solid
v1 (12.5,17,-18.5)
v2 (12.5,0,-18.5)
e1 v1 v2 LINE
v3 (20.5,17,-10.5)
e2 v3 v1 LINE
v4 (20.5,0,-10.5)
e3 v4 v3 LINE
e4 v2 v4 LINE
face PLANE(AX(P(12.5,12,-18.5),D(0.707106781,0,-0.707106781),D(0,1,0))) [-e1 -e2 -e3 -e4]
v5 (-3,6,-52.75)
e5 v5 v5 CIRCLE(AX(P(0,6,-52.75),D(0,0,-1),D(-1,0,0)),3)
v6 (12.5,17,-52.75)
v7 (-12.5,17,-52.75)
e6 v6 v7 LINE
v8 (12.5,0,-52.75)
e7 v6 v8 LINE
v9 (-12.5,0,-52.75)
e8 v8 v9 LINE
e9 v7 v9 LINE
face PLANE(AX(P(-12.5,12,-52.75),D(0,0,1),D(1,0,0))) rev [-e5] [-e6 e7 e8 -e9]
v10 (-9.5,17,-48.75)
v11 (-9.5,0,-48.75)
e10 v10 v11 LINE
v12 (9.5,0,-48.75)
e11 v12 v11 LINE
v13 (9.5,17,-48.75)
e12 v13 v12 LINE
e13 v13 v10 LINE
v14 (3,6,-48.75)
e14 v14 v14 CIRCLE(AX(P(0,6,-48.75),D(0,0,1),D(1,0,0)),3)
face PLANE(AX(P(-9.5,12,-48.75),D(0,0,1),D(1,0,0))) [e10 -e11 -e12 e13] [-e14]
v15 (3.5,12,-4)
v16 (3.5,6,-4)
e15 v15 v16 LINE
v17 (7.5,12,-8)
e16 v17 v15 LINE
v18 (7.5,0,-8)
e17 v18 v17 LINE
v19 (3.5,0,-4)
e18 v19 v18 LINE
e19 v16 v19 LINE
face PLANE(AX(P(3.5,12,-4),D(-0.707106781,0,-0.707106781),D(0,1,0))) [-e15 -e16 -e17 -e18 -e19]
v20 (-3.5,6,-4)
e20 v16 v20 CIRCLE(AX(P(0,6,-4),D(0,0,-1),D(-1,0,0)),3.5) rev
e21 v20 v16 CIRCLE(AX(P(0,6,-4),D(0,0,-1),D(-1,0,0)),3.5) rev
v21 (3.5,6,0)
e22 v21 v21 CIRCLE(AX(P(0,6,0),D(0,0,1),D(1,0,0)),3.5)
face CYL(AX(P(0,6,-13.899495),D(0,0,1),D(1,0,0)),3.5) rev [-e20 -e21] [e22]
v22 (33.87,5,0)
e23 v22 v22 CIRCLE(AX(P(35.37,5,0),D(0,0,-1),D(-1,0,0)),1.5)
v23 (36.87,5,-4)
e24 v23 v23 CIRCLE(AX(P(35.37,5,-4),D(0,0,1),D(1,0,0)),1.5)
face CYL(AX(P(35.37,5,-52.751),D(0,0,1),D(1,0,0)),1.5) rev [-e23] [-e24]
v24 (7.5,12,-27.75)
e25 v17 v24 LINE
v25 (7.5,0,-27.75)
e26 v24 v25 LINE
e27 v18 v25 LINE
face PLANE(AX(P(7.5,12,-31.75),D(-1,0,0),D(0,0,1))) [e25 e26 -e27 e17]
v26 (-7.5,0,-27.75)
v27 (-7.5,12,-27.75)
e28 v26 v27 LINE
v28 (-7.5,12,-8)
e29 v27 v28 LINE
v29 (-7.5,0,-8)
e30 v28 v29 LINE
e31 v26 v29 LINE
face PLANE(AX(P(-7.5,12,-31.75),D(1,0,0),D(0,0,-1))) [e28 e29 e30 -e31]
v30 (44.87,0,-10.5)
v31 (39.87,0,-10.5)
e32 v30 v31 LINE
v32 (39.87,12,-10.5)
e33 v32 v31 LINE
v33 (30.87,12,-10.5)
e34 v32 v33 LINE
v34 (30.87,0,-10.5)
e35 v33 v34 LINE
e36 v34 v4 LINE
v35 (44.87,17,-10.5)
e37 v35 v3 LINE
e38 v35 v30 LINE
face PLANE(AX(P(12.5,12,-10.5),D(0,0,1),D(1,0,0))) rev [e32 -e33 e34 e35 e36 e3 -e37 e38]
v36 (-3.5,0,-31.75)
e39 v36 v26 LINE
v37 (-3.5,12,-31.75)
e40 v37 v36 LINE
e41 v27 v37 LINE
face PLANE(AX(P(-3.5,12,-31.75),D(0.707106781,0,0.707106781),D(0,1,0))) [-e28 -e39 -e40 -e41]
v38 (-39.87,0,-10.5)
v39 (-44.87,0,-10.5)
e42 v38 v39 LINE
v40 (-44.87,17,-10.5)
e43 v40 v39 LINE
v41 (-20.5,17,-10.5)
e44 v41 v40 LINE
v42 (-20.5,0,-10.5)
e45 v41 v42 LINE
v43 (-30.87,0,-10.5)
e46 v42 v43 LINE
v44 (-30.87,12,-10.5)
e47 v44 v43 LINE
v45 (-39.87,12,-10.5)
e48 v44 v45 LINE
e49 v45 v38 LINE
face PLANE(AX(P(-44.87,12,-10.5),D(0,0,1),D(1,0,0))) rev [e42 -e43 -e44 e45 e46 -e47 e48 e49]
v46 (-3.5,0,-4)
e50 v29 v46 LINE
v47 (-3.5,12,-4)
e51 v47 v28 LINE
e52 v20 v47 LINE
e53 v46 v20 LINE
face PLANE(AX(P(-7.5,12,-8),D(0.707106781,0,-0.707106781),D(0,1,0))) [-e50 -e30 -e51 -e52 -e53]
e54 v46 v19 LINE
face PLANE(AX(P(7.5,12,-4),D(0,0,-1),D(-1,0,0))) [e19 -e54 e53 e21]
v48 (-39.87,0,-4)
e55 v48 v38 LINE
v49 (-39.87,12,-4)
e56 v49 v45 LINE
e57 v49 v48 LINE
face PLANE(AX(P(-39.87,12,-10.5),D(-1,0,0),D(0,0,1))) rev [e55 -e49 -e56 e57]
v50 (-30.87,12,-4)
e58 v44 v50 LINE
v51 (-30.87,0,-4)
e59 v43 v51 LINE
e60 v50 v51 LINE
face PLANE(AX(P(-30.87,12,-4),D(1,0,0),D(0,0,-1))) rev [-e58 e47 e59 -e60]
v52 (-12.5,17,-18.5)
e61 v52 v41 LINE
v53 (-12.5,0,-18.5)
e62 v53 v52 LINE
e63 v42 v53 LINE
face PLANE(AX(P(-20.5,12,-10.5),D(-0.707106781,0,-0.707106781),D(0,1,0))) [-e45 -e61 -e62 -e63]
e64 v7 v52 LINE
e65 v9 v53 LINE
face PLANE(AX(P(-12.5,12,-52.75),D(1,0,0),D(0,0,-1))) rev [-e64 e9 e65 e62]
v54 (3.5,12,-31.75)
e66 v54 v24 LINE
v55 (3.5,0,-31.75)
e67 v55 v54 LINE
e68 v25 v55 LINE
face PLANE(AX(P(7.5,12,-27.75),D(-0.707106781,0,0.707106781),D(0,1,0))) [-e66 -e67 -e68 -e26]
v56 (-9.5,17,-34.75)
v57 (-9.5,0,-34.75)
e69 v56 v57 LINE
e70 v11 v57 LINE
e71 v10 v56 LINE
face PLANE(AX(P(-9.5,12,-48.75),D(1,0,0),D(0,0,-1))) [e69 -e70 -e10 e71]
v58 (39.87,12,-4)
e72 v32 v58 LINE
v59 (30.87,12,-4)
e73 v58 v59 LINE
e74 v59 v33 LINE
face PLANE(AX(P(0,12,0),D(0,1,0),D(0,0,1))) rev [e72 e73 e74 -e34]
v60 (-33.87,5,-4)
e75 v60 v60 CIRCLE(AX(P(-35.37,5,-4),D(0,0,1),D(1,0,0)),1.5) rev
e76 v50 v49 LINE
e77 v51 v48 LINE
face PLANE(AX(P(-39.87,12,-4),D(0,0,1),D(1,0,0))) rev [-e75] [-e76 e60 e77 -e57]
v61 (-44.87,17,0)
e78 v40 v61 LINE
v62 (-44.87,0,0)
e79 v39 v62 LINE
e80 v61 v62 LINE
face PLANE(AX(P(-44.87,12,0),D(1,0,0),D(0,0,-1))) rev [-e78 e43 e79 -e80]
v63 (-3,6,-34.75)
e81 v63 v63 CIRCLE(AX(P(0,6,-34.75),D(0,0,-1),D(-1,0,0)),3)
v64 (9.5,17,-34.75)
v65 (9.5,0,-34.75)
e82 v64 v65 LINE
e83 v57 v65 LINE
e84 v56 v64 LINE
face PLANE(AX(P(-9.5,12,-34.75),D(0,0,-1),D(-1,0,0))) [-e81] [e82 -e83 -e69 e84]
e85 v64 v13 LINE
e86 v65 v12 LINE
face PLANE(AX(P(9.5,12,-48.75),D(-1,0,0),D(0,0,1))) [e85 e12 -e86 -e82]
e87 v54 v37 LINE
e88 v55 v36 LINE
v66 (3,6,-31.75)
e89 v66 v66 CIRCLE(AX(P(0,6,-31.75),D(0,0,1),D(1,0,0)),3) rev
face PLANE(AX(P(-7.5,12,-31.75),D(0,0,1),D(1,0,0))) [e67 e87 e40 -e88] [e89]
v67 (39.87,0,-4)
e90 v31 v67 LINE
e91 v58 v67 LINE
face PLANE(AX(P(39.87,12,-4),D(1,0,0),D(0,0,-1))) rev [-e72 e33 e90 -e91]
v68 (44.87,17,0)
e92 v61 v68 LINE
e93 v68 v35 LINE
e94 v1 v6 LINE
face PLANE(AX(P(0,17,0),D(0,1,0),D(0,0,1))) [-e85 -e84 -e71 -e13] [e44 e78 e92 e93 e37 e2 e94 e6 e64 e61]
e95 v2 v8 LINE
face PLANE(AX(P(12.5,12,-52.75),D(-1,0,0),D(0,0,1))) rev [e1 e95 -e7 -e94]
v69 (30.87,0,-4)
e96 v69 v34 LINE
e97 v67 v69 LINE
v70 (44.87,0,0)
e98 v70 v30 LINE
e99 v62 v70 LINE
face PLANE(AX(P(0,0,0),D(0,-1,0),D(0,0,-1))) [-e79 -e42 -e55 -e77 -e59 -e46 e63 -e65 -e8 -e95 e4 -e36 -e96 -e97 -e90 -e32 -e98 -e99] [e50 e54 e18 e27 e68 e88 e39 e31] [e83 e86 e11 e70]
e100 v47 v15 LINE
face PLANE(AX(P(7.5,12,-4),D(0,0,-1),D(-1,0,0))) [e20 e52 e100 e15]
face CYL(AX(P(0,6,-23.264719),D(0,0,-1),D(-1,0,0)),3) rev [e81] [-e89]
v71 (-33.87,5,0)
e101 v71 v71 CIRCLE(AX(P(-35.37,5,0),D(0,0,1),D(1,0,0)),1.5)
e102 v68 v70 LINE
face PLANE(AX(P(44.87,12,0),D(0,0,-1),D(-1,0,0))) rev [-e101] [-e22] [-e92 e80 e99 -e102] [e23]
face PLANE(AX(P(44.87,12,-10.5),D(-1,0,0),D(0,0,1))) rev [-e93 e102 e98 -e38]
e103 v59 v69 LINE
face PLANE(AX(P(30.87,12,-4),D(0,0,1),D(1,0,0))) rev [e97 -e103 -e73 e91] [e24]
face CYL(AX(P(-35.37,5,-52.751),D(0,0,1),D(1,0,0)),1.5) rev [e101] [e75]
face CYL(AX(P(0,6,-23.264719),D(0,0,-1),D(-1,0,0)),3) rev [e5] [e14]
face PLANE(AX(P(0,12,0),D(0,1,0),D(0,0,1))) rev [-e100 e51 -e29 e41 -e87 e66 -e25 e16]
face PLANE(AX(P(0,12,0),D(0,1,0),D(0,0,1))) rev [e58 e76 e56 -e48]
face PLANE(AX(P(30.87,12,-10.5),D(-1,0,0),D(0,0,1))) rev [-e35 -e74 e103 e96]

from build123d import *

# Parameters (mm, degrees)
SKETCH_1_W          = 19
SKETCH_1_H          = 14
EXTRUDE_1_DEPTH     = 12
CUT_EXTRUDE_2_REACH = 72.284
SKETCH_4_R          = 1.5
SKETCH_5_W          = 19
SKETCH_5_H          = 14
EXTRUDE_2_DEPTH     = 5
CUT_EXTRUDE_4_REACH = 73.308
SKETCH_6_R          = 3
SKETCH_7_R          = 3.5
CUT_EXTRUDE_5_DEPTH = 4
CHAMFER_1_SIZE      = 4
CHAMFER_2_SIZE      = 8


with BuildPart() as part:
    # 草图1 → 凸台-拉伸1 (new body)
    with BuildSketch(Plane(origin=(0, 0, 0), x_dir=(1, 0, 0), z_dir=(0, 1, 0))):
        Polygon((-30.87, 10.5), (-12.5, 10.5), (-12.5, 52.75), (12.5, 52.75), (12.5, 10.5), (30.87, 10.5), (30.87, 4), (39.87, 4), (39.87, 10.5), (44.87, 10.5), (44.87, 0), (-44.87, 0), (-44.87, 10.5), (-39.87, 10.5), (-39.87, 4), (-30.87, 4), align=None)
        with Locations((0, 41.75)):
            Rectangle(SKETCH_1_W, SKETCH_1_H, mode=Mode.SUBTRACT)
        Polygon((-7.5, 31.75), (7.5, 31.75), (7.5, 7.5), (7.5, 4), (-7.5, 4), (-7.5, 7.5), align=None, mode=Mode.SUBTRACT)
    extrude(amount=EXTRUDE_1_DEPTH)

    # 草图4 → 切除-拉伸2 (cut, up to next)
    with BuildSketch(Plane.XY, mode=Mode.PRIVATE) as cut_extrude_2_sk1:
        with Locations((-35.37, 5)):
            Circle(SKETCH_4_R)
    cut_extrude_2_tool1 = extrude(cut_extrude_2_sk1.sketch, amount=-CUT_EXTRUDE_2_REACH, mode=Mode.PRIVATE) & part.part
    # 草图4 → 切除-拉伸2 (cut, up to next)
    with BuildSketch(Plane.XY, mode=Mode.PRIVATE) as cut_extrude_2_sk2:
        with Locations((35.37, 5)):
            Circle(SKETCH_4_R)
    cut_extrude_2_tool2 = extrude(cut_extrude_2_sk2.sketch, amount=-CUT_EXTRUDE_2_REACH, mode=Mode.PRIVATE) & part.part
    add(cut_extrude_2_tool1.solids().sort_by_distance((-35.37, 5, 0))[0], mode=Mode.SUBTRACT)
    add(cut_extrude_2_tool2.solids().sort_by_distance((35.37, 5, 0))[0], mode=Mode.SUBTRACT)

    # 草图5 → 凸台-拉伸2 (add)
    with BuildSketch(Plane(origin=(0, 12, 0), x_dir=(1, 0, 0), z_dir=(0, 1, 0))):
        Polygon((-39.87, 10.5), (-30.87, 10.5), (-12.5, 10.5), (-12.5, 52.75), (12.5, 52.75), (12.5, 10.5), (30.87, 10.5), (39.87, 10.5), (44.87, 10.5), (44.87, 0), (-44.87, 0), (-44.87, 10.5), align=None)
        with Locations((0, 41.75)):
            Rectangle(SKETCH_5_W, SKETCH_5_H, mode=Mode.SUBTRACT)
    extrude(amount=EXTRUDE_2_DEPTH)

    # 切除-拉伸4: up to this face of the body (flat: up to its plane)
    cut_extrude_4_end = Plane(part.part.faces().sort_by_distance((0, 6, -31.75))[0])
    # 草图6 → 切除-拉伸4 (cut, up to the picked face)
    with BuildSketch(Plane(origin=(0, 0, -52.75), x_dir=(-1, 0, 0), z_dir=(0, 0, -1)), mode=Mode.PRIVATE) as cut_extrude_4_sk1:
        with Locations((0, 6)):
            Circle(SKETCH_6_R)
    cut_extrude_4_tool1 = split(extrude(cut_extrude_4_sk1.sketch, amount=-CUT_EXTRUDE_4_REACH, mode=Mode.PRIVATE), bisect_by=cut_extrude_4_end, keep=Keep.BOTH, mode=Mode.PRIVATE)
    add(cut_extrude_4_tool1.solids().sort_by(Axis((0, 6, -52.75), (0, 0, 1)))[0], mode=Mode.SUBTRACT)

    # 草图7 → 切除-拉伸5 (cut)
    with BuildSketch(Plane.XY):
        with Locations((0, 6)):
            Circle(SKETCH_7_R)
    extrude(amount=-CUT_EXTRUDE_5_DEPTH, mode=Mode.SUBTRACT)

    # 倒角1
    chamfer_1_edges = [part.edges().sort_by_distance(p)[0] for p in [
        (-7.5, 6, -4),
        (7.5, 6, -4),
        (7.5, 6, -31.75),
        (-7.5, 6, -31.75),
    ]]
    chamfer(chamfer_1_edges, length=CHAMFER_1_SIZE - 0.0001)  # a hair under: the kernel refuses the full size

    # 倒角2
    chamfer_2_edges = [part.edges().sort_by_distance(p)[0] for p in [
        (-12.5, 8.5, -10.5),
        (12.5, 8.5, -10.5),
    ]]
    chamfer(chamfer_2_edges, length=CHAMFER_2_SIZE)


solid = part.part
